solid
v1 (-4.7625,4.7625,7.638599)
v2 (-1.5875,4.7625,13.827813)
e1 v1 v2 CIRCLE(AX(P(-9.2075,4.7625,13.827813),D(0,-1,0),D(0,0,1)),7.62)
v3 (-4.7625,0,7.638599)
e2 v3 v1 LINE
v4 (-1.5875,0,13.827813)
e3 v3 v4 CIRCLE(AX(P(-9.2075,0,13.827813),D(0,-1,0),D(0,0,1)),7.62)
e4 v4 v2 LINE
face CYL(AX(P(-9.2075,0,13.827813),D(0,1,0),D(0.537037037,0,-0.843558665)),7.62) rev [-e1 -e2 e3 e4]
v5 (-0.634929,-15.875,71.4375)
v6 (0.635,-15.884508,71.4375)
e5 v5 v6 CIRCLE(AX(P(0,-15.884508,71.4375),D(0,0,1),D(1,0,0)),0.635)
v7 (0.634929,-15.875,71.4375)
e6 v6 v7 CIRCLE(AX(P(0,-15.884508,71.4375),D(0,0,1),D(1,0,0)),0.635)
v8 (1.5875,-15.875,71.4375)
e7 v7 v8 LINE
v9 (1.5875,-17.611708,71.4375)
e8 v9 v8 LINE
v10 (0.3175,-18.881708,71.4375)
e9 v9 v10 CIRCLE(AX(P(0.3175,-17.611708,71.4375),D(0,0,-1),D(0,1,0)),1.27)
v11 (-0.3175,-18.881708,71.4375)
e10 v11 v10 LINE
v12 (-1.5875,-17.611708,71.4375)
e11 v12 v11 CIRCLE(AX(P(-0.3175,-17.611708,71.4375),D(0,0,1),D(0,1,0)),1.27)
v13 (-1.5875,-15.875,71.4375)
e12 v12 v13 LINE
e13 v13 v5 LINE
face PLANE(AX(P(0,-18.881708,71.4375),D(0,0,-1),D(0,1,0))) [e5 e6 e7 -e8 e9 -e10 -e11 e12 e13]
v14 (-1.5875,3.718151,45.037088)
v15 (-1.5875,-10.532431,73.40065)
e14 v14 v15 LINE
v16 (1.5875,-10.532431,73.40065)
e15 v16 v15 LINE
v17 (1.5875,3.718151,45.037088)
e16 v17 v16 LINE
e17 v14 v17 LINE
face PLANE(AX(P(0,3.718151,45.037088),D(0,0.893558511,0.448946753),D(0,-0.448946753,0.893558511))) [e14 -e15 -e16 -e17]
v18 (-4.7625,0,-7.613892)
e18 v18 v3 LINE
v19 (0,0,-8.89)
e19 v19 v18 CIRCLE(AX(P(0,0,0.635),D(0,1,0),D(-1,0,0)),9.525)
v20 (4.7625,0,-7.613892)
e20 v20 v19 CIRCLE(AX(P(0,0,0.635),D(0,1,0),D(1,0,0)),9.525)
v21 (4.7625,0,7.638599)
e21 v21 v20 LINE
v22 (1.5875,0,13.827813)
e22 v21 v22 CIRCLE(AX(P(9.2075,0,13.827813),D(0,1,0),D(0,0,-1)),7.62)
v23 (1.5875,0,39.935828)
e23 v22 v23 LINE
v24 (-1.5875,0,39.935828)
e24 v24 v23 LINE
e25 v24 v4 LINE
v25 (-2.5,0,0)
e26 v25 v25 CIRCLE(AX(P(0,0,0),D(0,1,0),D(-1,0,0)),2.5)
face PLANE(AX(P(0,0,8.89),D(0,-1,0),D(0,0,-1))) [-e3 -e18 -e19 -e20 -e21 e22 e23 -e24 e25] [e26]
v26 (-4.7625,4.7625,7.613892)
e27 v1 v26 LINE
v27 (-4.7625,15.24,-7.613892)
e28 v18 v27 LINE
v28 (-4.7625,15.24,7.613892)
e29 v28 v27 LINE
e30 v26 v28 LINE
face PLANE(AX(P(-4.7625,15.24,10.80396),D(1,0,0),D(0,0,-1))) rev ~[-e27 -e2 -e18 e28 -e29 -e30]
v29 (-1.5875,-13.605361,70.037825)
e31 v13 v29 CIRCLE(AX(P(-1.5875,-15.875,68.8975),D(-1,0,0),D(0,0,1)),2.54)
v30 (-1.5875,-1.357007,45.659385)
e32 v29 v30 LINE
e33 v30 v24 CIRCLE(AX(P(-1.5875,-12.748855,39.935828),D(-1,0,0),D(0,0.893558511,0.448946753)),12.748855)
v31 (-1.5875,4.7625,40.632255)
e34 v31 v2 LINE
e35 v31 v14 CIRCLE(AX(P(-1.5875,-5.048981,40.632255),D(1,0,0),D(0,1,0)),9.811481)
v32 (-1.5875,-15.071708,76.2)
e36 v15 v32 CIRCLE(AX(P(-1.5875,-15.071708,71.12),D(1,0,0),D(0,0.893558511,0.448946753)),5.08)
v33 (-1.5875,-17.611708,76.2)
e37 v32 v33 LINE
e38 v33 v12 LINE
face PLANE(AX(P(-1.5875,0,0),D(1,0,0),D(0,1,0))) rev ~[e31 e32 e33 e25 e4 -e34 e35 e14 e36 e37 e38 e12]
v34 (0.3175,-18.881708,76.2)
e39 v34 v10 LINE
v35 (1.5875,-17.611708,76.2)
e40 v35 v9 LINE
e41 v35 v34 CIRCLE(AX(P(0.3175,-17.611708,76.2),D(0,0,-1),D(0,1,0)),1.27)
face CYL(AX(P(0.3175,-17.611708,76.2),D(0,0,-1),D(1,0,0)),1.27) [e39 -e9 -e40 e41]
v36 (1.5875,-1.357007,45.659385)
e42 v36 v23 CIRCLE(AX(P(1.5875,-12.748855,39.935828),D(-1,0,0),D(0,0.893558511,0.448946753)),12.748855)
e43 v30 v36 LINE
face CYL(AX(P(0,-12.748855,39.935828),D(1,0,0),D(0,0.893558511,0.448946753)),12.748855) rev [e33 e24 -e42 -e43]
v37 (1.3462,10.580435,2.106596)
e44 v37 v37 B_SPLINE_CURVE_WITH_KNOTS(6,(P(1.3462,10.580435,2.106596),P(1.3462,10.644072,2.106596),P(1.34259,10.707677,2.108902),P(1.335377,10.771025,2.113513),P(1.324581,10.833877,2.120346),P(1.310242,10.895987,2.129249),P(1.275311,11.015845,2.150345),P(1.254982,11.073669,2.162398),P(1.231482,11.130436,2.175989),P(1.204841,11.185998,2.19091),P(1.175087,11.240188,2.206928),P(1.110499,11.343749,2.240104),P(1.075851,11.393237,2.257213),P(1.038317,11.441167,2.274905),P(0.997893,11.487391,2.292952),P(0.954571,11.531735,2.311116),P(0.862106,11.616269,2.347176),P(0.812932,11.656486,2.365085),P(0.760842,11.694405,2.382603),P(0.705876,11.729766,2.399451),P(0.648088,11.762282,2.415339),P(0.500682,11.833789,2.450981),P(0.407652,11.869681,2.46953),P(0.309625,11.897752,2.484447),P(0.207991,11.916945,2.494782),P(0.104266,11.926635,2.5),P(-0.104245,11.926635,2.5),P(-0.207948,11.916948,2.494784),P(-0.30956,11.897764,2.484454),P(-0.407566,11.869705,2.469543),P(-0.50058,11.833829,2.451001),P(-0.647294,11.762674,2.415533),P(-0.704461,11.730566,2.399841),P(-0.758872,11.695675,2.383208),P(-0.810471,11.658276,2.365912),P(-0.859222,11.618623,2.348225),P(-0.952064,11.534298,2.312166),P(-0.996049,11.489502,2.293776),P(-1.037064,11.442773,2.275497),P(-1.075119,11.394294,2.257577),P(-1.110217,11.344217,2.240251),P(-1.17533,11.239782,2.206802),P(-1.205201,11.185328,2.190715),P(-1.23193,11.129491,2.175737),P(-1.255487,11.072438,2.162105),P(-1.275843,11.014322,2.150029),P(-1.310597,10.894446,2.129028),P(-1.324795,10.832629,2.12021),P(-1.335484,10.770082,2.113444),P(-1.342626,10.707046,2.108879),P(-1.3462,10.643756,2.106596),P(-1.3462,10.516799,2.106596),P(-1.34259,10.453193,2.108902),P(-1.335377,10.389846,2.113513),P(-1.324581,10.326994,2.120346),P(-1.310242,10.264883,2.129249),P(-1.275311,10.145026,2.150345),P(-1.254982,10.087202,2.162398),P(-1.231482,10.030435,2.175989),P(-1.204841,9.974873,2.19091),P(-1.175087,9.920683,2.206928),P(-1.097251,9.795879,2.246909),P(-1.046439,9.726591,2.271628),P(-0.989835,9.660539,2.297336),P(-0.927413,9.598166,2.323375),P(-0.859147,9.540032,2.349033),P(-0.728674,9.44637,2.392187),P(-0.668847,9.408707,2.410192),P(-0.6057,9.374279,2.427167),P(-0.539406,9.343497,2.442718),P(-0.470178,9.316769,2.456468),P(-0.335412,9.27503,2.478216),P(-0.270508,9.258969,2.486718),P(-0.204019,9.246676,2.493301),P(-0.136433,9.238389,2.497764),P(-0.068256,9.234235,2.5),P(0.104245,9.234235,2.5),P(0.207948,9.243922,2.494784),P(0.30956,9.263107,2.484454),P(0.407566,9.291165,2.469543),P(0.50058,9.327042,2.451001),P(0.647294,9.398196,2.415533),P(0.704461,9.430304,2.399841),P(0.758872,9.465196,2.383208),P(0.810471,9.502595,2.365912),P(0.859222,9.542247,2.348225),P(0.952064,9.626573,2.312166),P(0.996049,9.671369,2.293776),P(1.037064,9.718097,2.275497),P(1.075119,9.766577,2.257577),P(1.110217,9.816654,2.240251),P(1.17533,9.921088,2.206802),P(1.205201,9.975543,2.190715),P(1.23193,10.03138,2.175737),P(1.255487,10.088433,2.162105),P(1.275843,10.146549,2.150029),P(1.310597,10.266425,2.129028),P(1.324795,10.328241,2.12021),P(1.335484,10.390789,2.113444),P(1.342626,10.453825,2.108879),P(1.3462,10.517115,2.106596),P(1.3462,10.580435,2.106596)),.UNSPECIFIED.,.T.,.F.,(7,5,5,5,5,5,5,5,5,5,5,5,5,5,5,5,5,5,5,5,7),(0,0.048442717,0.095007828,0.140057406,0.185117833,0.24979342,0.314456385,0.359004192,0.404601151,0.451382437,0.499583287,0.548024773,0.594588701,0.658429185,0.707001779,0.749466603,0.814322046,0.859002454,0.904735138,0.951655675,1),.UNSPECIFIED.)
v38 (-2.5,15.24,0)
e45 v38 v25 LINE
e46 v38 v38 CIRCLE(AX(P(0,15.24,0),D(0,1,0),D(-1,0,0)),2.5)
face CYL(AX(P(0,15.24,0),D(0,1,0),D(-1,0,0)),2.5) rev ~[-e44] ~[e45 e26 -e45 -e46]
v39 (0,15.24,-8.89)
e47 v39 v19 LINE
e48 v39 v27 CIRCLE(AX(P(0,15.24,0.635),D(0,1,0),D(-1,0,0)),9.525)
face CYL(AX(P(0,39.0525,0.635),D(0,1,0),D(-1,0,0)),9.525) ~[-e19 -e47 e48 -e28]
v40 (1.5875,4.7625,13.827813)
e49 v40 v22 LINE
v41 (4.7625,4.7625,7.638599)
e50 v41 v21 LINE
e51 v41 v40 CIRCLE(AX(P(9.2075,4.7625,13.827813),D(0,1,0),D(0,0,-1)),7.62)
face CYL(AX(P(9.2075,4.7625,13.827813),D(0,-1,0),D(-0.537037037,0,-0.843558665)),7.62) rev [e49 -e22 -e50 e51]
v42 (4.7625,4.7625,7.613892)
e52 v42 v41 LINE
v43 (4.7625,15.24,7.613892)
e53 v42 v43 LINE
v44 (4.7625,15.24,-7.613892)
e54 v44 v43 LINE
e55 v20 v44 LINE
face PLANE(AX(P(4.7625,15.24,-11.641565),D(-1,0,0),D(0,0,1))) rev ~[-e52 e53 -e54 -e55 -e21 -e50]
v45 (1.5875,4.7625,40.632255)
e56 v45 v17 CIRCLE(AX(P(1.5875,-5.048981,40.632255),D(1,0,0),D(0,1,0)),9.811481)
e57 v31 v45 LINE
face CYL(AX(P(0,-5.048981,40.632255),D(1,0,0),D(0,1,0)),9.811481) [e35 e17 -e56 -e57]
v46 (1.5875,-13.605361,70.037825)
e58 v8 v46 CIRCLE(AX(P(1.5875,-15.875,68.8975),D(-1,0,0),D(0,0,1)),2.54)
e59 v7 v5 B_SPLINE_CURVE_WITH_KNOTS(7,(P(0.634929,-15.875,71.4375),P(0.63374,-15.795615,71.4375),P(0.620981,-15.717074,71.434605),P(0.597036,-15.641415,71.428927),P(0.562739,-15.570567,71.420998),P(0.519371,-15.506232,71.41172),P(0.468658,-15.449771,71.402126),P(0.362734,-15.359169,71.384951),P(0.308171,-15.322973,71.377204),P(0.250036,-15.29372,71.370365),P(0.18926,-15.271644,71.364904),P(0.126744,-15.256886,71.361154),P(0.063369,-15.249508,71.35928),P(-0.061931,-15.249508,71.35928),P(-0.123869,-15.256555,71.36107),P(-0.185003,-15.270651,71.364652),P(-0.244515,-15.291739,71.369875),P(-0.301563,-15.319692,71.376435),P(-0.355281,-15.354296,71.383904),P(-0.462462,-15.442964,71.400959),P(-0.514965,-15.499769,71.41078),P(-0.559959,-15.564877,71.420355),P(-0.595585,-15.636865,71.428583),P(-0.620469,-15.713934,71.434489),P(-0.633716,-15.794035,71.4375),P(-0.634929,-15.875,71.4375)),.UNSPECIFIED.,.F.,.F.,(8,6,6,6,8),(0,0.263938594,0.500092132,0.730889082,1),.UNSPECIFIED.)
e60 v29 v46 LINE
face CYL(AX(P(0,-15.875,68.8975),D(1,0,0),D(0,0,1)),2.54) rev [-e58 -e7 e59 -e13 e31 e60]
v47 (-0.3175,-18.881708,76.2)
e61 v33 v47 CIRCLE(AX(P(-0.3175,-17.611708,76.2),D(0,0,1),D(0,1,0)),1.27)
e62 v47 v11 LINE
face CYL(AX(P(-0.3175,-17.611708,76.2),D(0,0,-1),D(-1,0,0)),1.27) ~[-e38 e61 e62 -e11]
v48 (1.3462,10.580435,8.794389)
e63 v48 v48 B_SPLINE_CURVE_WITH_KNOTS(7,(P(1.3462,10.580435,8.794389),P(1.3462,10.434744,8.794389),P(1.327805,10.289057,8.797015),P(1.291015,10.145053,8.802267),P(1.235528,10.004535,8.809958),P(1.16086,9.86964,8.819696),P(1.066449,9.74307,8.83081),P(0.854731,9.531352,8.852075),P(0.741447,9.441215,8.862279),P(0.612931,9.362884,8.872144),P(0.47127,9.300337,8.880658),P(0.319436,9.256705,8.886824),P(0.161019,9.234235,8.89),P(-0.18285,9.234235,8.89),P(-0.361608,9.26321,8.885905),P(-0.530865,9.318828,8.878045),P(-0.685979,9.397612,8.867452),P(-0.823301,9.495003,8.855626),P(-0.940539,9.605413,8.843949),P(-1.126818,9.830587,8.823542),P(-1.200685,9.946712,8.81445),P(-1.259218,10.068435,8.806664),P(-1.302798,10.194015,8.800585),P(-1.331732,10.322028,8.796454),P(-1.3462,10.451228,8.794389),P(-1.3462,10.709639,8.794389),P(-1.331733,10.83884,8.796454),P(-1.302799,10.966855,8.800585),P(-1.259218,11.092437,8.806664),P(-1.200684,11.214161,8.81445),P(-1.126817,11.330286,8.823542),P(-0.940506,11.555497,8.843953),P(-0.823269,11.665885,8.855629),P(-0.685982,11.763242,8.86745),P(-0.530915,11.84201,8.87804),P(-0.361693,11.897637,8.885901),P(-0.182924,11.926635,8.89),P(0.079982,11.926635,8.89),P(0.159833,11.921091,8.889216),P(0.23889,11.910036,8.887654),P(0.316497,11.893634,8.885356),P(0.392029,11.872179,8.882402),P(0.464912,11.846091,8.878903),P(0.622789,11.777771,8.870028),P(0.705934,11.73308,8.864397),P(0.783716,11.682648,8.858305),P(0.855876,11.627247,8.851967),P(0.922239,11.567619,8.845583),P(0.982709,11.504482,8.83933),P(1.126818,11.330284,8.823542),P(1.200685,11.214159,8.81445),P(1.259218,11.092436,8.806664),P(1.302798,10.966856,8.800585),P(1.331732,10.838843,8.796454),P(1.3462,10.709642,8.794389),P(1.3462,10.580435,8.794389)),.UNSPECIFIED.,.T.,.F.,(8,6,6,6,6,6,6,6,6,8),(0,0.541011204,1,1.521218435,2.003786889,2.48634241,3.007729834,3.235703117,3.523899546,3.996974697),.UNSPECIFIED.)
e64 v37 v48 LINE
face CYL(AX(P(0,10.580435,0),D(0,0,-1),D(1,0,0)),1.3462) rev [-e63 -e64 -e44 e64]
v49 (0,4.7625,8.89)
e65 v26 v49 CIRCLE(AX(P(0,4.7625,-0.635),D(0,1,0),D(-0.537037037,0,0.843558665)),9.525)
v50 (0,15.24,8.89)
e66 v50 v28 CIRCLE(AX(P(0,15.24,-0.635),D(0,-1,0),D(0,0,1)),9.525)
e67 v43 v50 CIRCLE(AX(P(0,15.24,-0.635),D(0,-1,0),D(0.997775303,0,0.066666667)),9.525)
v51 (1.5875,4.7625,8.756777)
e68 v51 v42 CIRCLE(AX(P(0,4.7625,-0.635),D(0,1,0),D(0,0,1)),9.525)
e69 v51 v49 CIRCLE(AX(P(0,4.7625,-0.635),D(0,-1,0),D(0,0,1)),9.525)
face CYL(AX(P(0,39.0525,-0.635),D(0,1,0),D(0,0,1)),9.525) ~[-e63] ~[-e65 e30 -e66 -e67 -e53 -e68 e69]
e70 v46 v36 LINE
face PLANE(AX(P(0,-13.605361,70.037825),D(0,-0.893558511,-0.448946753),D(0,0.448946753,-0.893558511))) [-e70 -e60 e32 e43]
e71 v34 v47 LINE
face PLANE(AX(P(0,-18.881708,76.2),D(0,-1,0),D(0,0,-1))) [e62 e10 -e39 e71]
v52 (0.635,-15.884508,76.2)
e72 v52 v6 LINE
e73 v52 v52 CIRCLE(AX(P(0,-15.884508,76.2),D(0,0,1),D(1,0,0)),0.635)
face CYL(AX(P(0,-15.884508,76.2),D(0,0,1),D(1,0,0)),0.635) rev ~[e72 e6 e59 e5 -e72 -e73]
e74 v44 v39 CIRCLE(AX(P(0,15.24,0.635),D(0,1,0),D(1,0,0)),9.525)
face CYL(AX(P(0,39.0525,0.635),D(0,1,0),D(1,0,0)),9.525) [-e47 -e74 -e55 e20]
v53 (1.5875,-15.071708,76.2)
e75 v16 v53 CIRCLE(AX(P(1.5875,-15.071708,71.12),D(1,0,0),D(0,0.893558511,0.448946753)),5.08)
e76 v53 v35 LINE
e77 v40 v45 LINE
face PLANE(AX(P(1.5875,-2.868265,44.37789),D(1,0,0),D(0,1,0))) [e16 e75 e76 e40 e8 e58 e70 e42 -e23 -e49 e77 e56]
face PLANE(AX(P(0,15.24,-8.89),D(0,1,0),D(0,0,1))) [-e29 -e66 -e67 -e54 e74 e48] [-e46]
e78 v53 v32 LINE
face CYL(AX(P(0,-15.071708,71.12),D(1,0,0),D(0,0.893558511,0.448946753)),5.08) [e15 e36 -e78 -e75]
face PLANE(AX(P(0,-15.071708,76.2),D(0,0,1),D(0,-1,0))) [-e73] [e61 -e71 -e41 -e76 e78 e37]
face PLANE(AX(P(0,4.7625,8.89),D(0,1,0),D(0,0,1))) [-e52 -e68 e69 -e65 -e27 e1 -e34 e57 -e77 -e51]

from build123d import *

# Parameters (mm, degrees)
F2_DEPTH      = 1.5875
F2_DEPTH_BACK = 1.5875
F3_DEPTH      = 9.525
F3_DEPTH_BACK = 9.525
F4_T1_DEPTH   = 62.865
F4_T6_DEPTH   = 62.865
F4_T11_DEPTH  = 62.865
F4_T16_DEPTH  = 62.865
F4_T21_DEPTH  = 62.865
F5_R          = 2.5
F6_DEPTH      = 34.1227081721
F7_R          = 1.3462
F8_DEPTH      = 25.4
F9_R          = 7.62
F10_R         = 0.635
F11_DEPTH     = 25.4
F12_R         = 1.27
F14_DEPTH     = 34.1227081721


# Not quite as in the source:
# - a fillet or chamfer that OpenCascade refuses, or shapes differently, is made with other operations: its cross-section is extruded or revolved along the edge and cut away or added
# - a feature names something its author has since deleted; it is built from what else it names


with BuildPart() as f2:
    # F1 (on Right) → F2 (new body, two sides)
    with BuildSketch(Plane.YZ) as f2_sk:
        with BuildLine():
            Line((-18.8817081721, 76.2), (-18.8817081721, 71.4375))
            Line((-18.8817081721, 71.4375), (-15.875, 71.4375))
            ThreePointArc((-15.875, 71.4375), (-14.541737999, 71.0594464463), (-13.6053613819, 70.0378247534))
            Line((-13.6053613819, 70.0378247534), (-1.35700712, 45.6593854024))
            ThreePointArc((-1.35700712, 45.6593854024), (-0.3438898526, 42.8769409358), (0, 39.9358282931))
            Line((0, 39.9358282931), (0, 8.89))
            Line((0, 8.89), (4.7625, 8.89))
            Line((4.7625, 8.89), (4.7625, 40.6322548497))
            ThreePointArc((4.7625, 40.6322548497), (4.4978433834, 42.8957264678), (3.7181513215, 45.0370875254))
            Line((3.7181513215, 45.0370875254), (-10.5324309359, 73.4006495068))
            ThreePointArc((-10.5324309359, 73.4006495068), (-12.4051841702, 75.4438928927), (-15.0717081721, 76.2))
            Line((-15.0717081721, 76.2), (-18.8817081721, 76.2))
        make_face()
    extrude(amount=F2_DEPTH)
    extrude(f2_sk.sketch, amount=-F2_DEPTH_BACK)

    # F1 (on Right) → F3 (join, two sides)
    with BuildSketch(Plane.YZ) as f3_sk:
        Polygon((4.7625, 8.89), (0, 8.89), (0, -8.89), (15.24, -8.89), (15.24, 8.89), align=None)
    extrude(amount=F3_DEPTH)
    extrude(f3_sk.sketch, amount=-F3_DEPTH_BACK)

    # F4: fillet of radius 9.525 on 4 edges, made by hand

    # F4_s2 → F4_t1 (cut)
    with BuildSketch(Plane.XZ.offset(-39.0525)):
        with BuildLine():
            ThreePointArc((9.525, 0.635), (6.7351920908, -6.1001920908), (0, -8.89))
            Line((0, -8.89), (9.525, -8.89))
            Line((9.525, -8.89), (9.525, 0.635))
        make_face()
        with BuildLine():
            ThreePointArc((-9.525, 0.635), (-6.7351920908, -6.1001920908), (0, -8.89))
            Line((0, -8.89), (-9.525, -8.89))
            Line((-9.525, -8.89), (-9.525, 0.635))
        make_face()
    extrude(amount=F4_T1_DEPTH, mode=Mode.SUBTRACT)


with BuildPart() as f4_tool4:
    # F4_s5 → F4_t6 (new body)
    with BuildSketch(Plane.XZ.offset(23.8125)):
        with BuildLine():
            ThreePointArc((0, 8.89), (6.7351920908, 6.1001920908), (9.525, -0.635))
            Line((9.525, -0.635), (9.525, 8.89))
            Line((9.525, 8.89), (0, 8.89))
        make_face()
    extrude(amount=-F4_T6_DEPTH)

    split(bisect_by=Plane.YZ.offset(1.5875), keep=Keep.TOP)


with BuildPart() as f2_1:
    add(f2.part)

    # F4_t3: cut F4_tool4
    add(f4_tool4.part, mode=Mode.SUBTRACT)


with BuildPart() as f4_tool9:
    # F4_s10 → F4_t11 (new body)
    with BuildSketch(Plane.XZ.offset(23.8125)):
        with BuildLine():
            ThreePointArc((0, 8.89), (6.7351920908, 6.1001920908), (9.525, -0.635))
            Line((9.525, -0.635), (9.525, 8.89))
            Line((9.525, 8.89), (0, 8.89))
        make_face()
    extrude(amount=-F4_T11_DEPTH)

    split(bisect_by=Plane.XZ.offset(-4.7625), keep=Keep.BOTTOM)


with BuildPart() as f2_2:
    add(f2_1.part)

    # F4_t8: cut F4_tool9
    add(f4_tool9.part, mode=Mode.SUBTRACT)


with BuildPart() as f4_tool14:
    # F4_s15 → F4_t16 (new body)
    with BuildSketch(Plane.XZ.offset(-39.0525)):
        with BuildLine():
            ThreePointArc((0, 8.89), (-6.7351920908, 6.1001920908), (-9.525, -0.635))
            Line((-9.525, -0.635), (-9.525, 8.89))
            Line((-9.525, 8.89), (0, 8.89))
        make_face()
    extrude(amount=F4_T16_DEPTH)

    split(bisect_by=Plane.XZ.offset(-4.7625), keep=Keep.BOTTOM)


with BuildPart() as f2_3:
    add(f2_2.part)

    # F4_t13: cut F4_tool14
    add(f4_tool14.part, mode=Mode.SUBTRACT)


with BuildPart() as f4_tool19:
    # F4_s20 → F4_t21 (new body)
    with BuildSketch(Plane.XZ.offset(-39.0525)):
        with BuildLine():
            ThreePointArc((0, 8.89), (-6.7351920908, 6.1001920908), (-9.525, -0.635))
            Line((-9.525, -0.635), (-9.525, 8.89))
            Line((-9.525, 8.89), (0, 8.89))
        make_face()
    extrude(amount=F4_T21_DEPTH)

    split(bisect_by=Plane.YZ.offset(-1.5875), keep=Keep.BOTTOM)


with BuildPart() as f2_4:
    add(f2_3.part)

    # F4_t18: cut F4_tool19
    add(f4_tool19.part, mode=Mode.SUBTRACT)

    # F5 (on face) → F6 (cut, through all)
    with BuildSketch(Plane(origin=(0, 15.24, 0), x_dir=(-1, 0, 0), z_dir=(0, 1, 0))):
        Circle(F5_R)
    extrude(amount=-F6_DEPTH, mode=Mode.SUBTRACT)

    # F7 (on Top) → F8 (cut)
    with BuildSketch(Plane.XY):
        with Locations((0, 10.5804353952)):
            Circle(F7_R)
        with Locations((0, -26.9685275853)):
            Circle(F7_R)
    extrude(amount=F8_DEPTH, mode=Mode.SUBTRACT)

    # F9
    f9_edges = [f2_4.edges().sort_by_distance(p)[0] for p in [
        (-9.50381, 7.62, 0),
        (-1.5875, 2.38125, 8.756777),
        (1.5875, 2.38125, 8.756777),
    ]]
    fillet(f9_edges, radius=F9_R)

    # F10 (on face) → F11 (cut)
    with BuildSketch(Plane.XY.offset(76.2)):
        with Locations((0, -15.8845081721)):
            Circle(F10_R)
    extrude(amount=-F11_DEPTH, mode=Mode.SUBTRACT)

    # F12
    f12_edges = [f2_4.edges().sort_by_distance(p)[0] for p in [
        (1.5875, -18.881708, 73.81875),
        (-1.5875, -18.881708, 73.81875),
    ]]
    fillet(f12_edges, radius=F12_R)

    # F13 (on face) → F14 (cut, through all)
    with BuildSketch(Plane(origin=(0, 15.24, 0), x_dir=(-1, 0, 0), z_dir=(0, 1, 0))):
        Polygon((-4.7625, -11.6415646072), (-4.7625, 10.8039603039), (-9.6872693895, 10.8039603039), (-9.6872693895, -15.5402623288), (11.7396748797, -15.5402623288), (11.7396748797, 10.8039603039), (4.7625, 10.8039603039), (4.7625, -11.6415646072), align=None)
    extrude(amount=-F14_DEPTH, mode=Mode.SUBTRACT)


solid = f2_4.part
